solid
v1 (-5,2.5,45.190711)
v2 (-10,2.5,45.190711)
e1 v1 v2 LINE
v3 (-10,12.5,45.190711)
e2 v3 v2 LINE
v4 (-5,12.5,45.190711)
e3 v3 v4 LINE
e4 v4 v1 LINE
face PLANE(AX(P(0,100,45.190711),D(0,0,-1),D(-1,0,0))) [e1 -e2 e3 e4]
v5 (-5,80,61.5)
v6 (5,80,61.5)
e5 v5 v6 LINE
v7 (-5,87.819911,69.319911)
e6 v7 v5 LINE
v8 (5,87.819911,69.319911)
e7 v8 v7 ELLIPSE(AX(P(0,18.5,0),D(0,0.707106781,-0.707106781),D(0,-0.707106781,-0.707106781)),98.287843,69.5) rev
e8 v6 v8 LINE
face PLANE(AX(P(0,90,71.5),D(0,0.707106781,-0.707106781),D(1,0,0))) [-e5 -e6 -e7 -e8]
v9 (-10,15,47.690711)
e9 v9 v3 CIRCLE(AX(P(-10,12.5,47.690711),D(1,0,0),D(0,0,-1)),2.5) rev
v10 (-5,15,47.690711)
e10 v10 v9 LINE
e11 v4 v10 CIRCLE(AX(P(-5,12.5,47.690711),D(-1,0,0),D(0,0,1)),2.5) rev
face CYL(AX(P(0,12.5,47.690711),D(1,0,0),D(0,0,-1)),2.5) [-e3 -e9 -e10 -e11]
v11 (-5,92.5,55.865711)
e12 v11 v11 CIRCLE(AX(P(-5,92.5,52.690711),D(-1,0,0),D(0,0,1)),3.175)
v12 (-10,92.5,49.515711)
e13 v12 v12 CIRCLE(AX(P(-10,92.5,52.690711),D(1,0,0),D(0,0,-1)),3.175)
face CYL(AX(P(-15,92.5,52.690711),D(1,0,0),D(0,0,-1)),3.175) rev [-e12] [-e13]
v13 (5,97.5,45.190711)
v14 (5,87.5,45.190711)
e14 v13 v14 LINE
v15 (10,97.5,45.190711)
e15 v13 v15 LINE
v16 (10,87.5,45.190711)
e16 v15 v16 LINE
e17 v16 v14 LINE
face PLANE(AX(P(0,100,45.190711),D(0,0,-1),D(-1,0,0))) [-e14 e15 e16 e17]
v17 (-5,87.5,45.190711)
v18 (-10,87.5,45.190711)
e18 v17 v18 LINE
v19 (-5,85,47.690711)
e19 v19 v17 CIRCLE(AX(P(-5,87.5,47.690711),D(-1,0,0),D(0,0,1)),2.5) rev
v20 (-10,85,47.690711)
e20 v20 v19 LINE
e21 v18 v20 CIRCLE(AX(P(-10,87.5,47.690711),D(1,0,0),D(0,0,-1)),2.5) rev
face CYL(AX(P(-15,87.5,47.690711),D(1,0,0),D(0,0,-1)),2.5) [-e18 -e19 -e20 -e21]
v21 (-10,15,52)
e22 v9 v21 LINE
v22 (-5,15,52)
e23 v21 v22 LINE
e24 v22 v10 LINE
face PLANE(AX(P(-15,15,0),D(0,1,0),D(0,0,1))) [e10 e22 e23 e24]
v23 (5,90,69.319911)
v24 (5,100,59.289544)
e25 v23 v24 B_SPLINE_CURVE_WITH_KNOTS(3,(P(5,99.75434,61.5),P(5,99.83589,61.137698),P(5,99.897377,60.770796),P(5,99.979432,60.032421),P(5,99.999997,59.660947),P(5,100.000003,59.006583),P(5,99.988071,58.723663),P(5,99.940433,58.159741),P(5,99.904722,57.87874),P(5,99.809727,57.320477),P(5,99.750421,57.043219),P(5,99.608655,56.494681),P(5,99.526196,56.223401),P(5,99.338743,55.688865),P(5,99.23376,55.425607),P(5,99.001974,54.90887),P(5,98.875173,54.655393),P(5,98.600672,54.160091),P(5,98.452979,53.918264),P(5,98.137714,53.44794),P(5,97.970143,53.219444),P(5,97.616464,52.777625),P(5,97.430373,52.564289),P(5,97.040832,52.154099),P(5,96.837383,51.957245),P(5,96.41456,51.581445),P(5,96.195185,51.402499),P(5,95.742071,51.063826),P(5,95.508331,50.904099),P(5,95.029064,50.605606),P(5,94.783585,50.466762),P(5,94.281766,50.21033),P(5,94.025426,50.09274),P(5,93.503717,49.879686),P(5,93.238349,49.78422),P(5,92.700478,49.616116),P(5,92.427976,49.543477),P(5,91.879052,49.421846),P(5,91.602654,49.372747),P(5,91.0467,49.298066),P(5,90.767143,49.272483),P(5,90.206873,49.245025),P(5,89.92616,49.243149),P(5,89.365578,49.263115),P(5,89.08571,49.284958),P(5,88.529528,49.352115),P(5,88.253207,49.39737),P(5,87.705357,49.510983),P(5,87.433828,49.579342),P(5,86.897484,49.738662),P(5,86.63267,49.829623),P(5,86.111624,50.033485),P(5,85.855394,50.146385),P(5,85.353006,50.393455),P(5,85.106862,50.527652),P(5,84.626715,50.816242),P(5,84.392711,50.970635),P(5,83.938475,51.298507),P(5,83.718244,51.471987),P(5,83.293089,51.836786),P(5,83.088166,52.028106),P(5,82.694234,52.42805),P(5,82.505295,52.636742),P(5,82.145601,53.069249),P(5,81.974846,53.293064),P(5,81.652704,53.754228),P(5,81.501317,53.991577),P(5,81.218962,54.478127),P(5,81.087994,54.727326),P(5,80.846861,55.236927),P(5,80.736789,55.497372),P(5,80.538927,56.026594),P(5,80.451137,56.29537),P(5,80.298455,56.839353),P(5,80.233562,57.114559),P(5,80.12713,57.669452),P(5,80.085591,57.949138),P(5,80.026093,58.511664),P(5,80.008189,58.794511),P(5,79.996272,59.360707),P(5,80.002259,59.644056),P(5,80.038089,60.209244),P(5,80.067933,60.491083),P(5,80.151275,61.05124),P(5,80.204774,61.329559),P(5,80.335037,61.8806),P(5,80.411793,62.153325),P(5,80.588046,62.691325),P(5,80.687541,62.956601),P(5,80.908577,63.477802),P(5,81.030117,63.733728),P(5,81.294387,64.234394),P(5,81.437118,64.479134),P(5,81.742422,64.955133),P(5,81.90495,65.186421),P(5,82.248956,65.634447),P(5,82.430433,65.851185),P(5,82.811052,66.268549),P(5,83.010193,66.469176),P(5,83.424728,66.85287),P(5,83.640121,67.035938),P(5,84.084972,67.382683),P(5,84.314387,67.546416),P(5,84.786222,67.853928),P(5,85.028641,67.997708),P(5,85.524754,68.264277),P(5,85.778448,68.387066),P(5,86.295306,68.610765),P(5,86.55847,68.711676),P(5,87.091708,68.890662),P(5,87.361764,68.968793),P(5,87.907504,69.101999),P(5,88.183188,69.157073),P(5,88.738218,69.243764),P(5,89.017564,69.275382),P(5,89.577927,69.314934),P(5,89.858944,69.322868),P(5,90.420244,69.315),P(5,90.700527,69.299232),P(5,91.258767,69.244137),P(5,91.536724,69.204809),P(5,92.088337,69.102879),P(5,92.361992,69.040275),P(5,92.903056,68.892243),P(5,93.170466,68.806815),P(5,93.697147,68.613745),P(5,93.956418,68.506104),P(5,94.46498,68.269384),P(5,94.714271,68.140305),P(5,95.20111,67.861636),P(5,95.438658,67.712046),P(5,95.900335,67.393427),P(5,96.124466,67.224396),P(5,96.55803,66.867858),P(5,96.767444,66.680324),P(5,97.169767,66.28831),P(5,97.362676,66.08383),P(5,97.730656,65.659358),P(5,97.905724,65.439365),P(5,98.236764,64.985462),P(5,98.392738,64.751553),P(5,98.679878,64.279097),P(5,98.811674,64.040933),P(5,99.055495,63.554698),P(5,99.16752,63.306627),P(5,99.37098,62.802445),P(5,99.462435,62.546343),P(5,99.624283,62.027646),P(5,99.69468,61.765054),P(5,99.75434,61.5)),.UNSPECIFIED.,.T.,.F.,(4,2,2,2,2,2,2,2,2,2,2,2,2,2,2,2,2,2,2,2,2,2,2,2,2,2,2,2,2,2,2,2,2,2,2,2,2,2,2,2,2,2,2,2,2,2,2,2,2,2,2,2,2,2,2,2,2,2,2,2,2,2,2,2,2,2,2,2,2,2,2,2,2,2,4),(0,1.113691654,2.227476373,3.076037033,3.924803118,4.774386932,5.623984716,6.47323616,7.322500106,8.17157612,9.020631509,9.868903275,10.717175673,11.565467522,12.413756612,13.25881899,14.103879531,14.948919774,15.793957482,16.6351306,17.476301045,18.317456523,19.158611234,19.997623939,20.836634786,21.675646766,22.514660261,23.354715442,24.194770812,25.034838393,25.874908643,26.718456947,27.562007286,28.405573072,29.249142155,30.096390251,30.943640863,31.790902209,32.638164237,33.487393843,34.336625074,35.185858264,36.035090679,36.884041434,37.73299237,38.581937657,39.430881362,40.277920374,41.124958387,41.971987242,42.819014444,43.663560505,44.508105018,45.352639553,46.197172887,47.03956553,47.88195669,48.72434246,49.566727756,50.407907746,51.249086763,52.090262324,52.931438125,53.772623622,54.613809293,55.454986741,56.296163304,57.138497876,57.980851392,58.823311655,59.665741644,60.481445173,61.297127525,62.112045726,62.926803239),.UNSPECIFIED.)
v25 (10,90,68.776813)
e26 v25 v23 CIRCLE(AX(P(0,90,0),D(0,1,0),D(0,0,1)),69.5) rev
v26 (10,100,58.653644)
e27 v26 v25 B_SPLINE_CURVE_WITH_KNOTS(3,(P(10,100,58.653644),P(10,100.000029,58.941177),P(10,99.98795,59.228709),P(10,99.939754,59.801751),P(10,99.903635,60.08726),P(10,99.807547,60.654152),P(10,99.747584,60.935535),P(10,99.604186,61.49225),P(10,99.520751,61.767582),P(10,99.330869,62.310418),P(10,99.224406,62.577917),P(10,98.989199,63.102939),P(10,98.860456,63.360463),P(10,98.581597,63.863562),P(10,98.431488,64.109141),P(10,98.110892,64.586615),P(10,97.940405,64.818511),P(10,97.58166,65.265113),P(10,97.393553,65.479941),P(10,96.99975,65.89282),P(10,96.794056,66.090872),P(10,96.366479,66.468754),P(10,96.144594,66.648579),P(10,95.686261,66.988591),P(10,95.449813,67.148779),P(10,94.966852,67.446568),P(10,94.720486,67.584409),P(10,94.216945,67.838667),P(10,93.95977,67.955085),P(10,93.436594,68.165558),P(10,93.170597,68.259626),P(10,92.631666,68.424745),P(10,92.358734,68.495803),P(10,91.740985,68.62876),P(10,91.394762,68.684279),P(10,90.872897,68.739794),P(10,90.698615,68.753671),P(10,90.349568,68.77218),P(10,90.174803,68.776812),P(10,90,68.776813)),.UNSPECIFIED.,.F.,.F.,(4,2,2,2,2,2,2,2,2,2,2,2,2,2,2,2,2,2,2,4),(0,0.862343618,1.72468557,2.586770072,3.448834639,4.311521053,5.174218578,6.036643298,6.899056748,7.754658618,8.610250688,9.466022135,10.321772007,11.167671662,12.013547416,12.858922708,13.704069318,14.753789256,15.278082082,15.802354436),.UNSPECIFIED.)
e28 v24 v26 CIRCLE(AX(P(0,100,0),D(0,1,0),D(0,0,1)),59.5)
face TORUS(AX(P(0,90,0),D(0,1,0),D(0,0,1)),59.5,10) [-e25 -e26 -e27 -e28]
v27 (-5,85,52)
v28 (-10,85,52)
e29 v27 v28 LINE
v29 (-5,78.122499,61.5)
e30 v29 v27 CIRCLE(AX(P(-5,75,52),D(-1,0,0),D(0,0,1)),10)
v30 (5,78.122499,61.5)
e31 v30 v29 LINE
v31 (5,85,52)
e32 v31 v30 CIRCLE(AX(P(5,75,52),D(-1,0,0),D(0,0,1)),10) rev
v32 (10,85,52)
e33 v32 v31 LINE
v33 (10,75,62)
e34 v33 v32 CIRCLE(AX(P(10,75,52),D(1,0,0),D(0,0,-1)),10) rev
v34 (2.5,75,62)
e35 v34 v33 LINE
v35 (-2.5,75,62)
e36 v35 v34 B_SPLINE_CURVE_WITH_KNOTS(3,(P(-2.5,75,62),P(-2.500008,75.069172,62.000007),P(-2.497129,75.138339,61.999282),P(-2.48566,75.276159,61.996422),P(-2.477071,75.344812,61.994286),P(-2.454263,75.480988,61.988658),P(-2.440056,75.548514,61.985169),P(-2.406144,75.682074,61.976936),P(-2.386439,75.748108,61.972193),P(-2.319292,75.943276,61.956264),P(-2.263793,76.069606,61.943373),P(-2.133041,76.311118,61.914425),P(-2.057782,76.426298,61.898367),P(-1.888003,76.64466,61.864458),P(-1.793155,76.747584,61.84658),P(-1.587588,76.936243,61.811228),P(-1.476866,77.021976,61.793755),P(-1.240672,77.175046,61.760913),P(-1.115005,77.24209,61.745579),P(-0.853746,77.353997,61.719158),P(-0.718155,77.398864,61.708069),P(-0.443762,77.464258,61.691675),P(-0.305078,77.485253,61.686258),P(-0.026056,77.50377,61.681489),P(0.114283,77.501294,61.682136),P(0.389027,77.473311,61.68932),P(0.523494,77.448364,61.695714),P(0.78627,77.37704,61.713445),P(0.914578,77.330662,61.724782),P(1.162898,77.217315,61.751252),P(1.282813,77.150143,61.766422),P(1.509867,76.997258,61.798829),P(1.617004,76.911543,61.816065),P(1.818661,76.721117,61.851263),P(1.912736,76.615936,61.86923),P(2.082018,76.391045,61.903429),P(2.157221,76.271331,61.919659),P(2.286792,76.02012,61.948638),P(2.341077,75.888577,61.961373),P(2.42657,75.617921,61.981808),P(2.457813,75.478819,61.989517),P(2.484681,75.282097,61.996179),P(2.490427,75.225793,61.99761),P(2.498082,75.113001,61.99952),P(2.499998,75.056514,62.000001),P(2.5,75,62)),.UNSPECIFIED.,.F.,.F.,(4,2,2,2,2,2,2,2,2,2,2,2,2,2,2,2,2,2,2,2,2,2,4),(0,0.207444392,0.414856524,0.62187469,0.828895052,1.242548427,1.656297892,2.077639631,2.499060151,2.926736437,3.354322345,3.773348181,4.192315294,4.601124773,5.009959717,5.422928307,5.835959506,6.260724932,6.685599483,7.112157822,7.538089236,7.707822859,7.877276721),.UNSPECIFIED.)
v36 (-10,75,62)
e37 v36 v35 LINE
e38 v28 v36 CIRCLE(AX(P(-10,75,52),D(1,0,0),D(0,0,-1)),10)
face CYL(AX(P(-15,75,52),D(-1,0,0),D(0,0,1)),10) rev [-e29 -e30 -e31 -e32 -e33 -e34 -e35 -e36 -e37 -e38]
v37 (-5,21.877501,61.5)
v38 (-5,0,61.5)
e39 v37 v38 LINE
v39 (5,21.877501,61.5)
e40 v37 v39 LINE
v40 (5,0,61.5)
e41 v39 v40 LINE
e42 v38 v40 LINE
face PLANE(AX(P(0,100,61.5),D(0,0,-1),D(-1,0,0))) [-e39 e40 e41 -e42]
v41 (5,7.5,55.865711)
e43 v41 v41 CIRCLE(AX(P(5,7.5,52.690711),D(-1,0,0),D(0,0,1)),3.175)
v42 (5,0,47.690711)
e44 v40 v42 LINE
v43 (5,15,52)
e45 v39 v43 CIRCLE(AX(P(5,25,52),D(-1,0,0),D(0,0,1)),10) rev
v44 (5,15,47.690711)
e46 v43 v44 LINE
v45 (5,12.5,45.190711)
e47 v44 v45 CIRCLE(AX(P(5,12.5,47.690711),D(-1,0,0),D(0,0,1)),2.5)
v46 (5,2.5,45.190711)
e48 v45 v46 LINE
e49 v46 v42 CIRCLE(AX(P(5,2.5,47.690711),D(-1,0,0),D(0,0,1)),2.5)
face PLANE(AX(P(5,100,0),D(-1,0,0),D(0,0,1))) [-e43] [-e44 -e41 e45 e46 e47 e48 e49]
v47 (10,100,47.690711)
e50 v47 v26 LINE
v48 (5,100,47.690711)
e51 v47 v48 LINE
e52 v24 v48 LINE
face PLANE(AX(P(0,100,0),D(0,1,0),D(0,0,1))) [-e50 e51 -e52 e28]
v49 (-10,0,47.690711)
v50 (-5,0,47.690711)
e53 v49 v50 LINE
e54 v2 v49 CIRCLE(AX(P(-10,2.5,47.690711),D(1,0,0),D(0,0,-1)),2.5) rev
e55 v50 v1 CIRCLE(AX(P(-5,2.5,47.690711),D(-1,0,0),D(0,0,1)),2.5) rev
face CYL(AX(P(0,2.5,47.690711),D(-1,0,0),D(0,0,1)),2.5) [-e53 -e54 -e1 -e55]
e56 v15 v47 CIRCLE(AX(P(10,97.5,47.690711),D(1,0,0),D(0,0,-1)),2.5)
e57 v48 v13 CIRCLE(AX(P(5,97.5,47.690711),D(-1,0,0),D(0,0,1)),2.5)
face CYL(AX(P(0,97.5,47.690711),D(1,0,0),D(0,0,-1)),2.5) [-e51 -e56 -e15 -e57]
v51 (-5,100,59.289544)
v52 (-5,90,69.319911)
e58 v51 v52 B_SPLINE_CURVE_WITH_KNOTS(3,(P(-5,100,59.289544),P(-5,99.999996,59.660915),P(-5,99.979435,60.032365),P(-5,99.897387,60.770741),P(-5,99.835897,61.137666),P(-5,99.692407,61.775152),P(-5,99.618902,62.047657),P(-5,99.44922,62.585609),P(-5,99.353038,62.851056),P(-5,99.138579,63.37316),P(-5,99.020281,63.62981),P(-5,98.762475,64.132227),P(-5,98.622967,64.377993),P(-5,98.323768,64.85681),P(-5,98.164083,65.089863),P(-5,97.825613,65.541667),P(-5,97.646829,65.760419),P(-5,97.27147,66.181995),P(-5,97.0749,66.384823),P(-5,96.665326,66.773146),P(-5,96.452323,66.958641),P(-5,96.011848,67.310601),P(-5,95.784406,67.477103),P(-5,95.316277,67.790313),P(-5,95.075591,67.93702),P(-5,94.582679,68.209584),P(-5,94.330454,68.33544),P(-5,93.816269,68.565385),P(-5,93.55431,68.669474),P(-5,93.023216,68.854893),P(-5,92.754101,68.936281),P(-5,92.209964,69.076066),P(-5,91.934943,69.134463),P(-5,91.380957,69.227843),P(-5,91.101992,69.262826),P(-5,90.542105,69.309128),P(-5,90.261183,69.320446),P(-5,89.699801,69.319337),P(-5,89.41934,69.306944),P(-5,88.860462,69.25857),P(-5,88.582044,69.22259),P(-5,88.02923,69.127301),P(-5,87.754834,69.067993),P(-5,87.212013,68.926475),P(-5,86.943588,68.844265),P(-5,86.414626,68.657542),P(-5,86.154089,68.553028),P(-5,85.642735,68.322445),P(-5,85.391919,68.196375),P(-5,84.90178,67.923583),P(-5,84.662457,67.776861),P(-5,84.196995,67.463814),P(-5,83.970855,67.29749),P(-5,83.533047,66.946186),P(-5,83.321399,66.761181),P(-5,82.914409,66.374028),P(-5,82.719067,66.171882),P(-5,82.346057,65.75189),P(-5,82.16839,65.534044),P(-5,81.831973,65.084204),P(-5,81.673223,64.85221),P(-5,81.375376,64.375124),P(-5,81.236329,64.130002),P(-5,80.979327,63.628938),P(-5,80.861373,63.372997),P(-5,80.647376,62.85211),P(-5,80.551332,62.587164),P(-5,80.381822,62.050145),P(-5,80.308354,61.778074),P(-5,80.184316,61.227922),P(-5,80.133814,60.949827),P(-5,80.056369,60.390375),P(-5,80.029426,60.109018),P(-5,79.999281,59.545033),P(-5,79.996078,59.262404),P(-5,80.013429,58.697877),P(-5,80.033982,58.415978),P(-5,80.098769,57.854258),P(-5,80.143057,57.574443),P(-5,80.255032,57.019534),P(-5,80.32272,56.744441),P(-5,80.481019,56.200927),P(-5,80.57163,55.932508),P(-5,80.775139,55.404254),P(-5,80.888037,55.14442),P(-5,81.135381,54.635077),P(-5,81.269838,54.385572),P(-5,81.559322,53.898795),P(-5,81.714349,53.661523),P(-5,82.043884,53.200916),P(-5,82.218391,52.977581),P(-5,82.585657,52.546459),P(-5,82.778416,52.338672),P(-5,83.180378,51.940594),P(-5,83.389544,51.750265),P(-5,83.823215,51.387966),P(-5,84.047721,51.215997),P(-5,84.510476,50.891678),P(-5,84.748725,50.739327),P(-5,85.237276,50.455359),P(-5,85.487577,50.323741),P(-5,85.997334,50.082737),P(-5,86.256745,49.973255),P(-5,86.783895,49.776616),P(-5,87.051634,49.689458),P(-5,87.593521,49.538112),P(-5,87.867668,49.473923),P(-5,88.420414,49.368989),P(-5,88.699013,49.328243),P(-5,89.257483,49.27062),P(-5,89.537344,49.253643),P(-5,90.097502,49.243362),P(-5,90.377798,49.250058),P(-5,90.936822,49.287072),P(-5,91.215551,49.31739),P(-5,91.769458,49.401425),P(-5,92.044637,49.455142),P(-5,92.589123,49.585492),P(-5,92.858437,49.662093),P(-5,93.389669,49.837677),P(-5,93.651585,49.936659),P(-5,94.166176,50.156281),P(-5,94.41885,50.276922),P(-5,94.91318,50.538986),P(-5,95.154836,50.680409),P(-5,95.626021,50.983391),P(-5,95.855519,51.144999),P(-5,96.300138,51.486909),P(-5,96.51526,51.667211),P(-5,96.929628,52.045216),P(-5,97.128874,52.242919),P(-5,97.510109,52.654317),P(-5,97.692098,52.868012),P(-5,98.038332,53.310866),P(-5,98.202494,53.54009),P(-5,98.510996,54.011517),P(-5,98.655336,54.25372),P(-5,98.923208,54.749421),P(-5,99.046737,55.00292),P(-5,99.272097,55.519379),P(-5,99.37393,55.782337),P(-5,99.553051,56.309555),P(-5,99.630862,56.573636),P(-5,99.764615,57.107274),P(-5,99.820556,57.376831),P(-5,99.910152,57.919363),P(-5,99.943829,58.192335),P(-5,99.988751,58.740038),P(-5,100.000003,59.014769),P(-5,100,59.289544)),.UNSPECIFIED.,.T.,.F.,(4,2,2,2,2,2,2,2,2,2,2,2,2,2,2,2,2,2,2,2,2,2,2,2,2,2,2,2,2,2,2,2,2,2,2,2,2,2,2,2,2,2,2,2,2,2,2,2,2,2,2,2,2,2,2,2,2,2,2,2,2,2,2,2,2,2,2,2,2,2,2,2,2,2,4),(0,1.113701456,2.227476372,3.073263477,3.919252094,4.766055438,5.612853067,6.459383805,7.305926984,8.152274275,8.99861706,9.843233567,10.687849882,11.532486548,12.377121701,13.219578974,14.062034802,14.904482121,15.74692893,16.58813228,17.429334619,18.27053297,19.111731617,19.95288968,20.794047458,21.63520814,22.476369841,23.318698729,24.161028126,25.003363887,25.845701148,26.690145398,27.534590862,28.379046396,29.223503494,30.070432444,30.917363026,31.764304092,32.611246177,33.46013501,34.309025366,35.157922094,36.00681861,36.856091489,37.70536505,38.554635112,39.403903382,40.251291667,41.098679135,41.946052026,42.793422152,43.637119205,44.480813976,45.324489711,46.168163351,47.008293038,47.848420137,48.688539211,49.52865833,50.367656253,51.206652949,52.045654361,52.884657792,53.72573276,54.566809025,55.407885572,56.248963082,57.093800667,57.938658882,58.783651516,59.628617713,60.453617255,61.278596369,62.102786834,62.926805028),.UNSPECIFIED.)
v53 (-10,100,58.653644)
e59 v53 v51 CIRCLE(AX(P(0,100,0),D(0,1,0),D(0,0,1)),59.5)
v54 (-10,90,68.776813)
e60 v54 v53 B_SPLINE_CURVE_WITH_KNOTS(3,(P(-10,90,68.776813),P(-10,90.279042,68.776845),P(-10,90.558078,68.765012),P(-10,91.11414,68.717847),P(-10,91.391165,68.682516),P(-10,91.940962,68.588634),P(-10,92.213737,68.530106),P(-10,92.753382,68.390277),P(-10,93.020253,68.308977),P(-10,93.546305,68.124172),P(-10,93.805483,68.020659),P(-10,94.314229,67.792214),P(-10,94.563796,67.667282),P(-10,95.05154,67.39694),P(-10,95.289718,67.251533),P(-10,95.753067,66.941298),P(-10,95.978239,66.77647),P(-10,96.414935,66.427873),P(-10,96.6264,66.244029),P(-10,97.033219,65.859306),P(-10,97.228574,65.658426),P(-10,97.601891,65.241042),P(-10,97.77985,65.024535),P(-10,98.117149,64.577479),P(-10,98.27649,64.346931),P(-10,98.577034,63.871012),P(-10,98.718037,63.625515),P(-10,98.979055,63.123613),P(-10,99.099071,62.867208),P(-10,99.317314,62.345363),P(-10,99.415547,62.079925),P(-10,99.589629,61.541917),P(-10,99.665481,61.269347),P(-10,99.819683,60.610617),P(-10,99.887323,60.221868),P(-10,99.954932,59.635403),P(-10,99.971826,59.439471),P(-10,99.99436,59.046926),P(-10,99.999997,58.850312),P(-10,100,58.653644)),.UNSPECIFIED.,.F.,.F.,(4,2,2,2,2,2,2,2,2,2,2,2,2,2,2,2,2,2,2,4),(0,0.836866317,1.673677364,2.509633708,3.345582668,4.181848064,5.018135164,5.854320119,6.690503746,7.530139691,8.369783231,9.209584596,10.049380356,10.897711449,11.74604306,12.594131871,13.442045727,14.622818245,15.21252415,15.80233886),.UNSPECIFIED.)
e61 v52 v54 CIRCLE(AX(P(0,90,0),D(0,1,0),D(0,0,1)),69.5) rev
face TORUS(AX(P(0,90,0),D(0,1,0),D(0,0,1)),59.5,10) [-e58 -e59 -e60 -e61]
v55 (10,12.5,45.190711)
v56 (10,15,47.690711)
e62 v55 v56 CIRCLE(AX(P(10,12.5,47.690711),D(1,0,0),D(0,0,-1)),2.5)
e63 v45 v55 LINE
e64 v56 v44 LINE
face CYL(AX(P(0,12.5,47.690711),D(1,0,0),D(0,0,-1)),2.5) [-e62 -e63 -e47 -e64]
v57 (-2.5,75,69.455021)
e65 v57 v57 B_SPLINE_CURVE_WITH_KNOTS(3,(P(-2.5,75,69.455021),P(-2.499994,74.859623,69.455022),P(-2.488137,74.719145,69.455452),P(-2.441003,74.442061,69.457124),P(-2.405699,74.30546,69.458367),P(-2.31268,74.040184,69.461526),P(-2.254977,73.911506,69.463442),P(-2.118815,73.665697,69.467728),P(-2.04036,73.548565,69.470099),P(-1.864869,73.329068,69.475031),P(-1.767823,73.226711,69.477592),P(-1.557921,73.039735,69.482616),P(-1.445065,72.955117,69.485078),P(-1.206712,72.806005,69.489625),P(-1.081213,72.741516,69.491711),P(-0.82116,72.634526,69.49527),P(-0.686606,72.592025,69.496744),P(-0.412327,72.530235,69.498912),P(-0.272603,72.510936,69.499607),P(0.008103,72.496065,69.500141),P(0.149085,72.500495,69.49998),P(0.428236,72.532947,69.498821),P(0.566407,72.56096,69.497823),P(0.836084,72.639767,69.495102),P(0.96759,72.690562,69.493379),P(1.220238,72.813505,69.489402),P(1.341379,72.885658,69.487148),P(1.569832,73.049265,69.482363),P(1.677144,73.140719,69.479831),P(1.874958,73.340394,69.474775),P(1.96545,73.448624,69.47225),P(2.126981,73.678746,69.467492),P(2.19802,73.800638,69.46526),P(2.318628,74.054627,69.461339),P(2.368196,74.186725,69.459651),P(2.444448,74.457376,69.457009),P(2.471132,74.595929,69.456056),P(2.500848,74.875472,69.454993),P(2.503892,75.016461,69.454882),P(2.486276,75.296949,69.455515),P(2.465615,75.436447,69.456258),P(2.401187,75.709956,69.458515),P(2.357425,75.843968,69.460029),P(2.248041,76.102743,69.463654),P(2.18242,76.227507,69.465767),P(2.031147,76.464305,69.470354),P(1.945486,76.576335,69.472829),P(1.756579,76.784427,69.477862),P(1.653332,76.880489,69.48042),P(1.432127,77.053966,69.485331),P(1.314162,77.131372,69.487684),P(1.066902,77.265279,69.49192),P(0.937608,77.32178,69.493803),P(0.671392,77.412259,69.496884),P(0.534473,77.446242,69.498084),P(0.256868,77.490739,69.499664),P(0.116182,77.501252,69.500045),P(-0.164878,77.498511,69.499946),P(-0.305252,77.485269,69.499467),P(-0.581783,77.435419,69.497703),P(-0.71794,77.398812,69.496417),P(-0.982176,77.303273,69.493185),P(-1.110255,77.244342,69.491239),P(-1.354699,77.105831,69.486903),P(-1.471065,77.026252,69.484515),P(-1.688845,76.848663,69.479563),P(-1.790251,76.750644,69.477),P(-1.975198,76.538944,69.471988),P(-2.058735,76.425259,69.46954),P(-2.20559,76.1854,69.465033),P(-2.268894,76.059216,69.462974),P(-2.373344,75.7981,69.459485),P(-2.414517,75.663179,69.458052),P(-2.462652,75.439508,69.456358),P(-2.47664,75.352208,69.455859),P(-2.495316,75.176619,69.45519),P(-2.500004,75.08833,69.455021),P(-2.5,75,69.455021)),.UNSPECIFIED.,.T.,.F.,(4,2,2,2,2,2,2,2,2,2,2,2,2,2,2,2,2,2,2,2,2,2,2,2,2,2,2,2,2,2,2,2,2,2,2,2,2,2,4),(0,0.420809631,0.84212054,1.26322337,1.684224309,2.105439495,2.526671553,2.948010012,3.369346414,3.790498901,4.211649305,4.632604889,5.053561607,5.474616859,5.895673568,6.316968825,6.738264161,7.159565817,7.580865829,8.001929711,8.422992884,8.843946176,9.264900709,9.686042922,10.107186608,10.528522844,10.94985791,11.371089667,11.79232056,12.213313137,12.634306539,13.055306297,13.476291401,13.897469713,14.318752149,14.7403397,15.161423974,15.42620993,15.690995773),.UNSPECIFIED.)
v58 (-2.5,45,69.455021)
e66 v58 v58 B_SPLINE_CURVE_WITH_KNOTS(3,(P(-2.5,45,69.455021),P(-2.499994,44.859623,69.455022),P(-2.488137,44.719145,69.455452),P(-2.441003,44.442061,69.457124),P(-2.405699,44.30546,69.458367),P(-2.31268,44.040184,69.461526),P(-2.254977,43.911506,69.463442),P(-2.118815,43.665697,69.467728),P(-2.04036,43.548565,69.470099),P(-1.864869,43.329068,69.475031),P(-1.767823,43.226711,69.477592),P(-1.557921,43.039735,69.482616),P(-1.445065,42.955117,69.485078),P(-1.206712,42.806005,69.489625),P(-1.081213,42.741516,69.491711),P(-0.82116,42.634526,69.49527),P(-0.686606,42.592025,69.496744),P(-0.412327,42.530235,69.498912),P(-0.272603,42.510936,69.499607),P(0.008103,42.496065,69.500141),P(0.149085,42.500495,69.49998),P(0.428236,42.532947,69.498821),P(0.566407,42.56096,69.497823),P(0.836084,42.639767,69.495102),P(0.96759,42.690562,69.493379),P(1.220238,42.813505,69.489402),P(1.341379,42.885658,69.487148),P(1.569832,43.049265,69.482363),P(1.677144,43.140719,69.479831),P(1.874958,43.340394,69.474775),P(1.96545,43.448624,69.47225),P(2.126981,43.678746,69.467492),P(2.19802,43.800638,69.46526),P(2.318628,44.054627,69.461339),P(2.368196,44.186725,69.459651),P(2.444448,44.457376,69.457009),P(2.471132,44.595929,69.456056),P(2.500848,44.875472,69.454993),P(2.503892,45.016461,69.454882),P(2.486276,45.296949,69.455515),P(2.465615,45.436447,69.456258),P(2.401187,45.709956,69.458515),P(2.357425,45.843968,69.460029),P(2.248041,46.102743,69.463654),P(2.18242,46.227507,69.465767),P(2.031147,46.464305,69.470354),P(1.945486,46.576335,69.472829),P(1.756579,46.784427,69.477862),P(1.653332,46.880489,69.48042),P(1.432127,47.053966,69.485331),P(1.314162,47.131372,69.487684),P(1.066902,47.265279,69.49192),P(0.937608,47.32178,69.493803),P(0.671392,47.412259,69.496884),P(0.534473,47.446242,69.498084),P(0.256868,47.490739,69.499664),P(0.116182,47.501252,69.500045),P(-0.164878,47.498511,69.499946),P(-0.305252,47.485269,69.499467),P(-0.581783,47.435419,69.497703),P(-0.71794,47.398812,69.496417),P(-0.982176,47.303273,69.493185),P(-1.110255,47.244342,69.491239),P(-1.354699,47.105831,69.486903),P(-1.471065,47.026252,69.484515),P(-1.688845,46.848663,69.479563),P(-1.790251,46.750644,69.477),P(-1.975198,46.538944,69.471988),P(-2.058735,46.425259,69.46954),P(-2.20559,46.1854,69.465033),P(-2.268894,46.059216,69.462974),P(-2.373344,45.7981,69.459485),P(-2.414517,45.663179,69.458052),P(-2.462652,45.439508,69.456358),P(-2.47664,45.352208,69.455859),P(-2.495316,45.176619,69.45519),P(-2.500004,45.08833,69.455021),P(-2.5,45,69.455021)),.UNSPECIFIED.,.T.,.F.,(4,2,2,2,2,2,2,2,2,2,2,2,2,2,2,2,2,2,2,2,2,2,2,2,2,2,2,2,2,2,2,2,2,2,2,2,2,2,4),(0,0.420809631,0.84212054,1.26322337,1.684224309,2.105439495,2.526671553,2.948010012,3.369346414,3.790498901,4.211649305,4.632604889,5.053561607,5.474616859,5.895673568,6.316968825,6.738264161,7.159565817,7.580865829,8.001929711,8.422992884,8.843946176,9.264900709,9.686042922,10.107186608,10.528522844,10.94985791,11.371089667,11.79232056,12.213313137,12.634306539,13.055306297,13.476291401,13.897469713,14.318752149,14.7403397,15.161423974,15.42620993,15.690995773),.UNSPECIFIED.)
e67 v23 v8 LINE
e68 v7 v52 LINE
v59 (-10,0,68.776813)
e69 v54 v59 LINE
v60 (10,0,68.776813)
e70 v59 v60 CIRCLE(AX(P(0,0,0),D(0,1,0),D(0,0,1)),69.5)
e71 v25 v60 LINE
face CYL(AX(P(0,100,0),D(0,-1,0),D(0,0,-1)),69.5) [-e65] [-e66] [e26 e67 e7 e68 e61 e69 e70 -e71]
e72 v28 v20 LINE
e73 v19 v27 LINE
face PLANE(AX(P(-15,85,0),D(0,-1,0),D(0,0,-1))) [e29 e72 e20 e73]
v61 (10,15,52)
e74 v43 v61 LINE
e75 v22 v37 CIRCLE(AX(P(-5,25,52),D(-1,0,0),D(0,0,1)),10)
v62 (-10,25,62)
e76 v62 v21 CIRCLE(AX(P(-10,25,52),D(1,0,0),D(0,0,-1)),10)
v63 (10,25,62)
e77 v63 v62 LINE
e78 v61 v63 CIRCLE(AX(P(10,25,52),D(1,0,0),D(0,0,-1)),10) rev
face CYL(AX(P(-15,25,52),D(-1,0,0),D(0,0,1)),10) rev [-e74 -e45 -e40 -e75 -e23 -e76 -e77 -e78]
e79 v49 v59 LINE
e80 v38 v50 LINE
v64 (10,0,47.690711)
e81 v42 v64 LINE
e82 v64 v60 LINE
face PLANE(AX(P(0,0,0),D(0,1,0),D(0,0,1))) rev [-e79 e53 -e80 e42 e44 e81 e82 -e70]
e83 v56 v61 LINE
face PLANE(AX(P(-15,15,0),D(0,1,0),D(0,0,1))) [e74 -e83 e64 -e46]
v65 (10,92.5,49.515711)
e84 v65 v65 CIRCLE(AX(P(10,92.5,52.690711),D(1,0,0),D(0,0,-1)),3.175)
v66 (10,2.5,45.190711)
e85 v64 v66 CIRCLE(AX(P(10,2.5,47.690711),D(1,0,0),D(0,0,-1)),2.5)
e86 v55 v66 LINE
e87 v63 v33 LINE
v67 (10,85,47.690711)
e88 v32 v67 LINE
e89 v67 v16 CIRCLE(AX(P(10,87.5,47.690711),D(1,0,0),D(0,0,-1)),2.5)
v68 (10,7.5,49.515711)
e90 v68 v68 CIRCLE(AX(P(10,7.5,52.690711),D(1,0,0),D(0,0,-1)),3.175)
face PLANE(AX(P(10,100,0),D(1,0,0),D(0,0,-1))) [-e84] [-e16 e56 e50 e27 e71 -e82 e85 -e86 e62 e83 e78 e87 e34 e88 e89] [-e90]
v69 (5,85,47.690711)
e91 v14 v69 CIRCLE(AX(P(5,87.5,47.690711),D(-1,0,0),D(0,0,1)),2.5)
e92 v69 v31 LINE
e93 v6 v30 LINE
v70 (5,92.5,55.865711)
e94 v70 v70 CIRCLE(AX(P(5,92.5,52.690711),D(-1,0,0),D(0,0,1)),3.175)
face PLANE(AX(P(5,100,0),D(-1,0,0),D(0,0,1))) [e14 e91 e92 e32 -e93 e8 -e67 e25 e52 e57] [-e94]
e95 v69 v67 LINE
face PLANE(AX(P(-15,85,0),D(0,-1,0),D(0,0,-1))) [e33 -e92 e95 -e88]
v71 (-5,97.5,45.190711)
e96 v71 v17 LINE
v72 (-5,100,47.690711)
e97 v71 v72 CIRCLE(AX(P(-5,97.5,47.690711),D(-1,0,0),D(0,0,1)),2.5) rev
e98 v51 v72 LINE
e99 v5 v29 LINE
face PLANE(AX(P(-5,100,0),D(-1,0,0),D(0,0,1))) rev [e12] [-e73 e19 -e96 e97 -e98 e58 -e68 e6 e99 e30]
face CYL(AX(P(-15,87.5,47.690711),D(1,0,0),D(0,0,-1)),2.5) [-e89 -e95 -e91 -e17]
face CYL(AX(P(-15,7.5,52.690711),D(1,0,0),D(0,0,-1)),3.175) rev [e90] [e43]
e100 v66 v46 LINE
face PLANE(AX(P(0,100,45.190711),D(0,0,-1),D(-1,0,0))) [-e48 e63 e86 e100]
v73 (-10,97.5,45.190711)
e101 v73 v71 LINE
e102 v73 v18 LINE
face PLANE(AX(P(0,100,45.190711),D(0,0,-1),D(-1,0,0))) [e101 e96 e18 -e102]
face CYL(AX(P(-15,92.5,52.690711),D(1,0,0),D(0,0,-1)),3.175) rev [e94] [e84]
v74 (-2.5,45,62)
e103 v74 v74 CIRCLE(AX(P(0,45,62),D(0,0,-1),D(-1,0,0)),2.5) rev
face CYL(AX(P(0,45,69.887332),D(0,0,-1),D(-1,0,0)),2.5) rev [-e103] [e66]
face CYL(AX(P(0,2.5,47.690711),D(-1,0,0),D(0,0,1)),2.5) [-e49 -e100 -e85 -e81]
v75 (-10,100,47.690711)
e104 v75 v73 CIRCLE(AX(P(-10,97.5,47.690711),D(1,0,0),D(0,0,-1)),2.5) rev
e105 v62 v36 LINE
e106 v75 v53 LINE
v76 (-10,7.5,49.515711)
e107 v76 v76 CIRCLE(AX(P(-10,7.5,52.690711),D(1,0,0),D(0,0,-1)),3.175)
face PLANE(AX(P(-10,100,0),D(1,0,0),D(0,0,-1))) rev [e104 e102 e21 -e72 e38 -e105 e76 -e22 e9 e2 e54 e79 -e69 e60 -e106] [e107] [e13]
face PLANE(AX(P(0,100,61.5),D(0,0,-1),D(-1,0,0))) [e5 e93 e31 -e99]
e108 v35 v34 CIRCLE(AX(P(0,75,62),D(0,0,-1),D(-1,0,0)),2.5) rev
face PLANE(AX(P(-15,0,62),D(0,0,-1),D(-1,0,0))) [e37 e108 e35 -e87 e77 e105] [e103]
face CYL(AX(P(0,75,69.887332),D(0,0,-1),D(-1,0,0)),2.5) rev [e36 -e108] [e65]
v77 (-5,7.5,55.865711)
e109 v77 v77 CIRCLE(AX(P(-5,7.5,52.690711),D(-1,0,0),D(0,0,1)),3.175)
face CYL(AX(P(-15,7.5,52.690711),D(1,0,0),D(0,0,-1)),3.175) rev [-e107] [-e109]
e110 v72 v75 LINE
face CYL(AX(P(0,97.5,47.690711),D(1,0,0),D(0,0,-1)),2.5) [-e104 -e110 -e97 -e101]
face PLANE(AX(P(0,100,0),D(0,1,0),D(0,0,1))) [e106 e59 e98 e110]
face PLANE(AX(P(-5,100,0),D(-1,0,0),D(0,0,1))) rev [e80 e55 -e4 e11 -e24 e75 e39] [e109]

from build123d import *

# Parameters (mm, degrees)
SKETCH1_W               = 5
SKETCH1_H               = 5.034727375
SKETCH1_H_2             = 16.309288723
BOSS_EXTRUDE10_DEPTH    = 100
SKETCH17_W              = 16.809288723
SKETCH17_H              = 70
CUT_EXTRUDE1_DEPTH      = 25
FILLET1_R               = 10
FILLET2_R               = 2.5
FILLET3_R               = 10
SKETCH17_3_R            = 3.175
CUT_EXTRUDE2_DEPTH      = 25
CUT_EXTRUDE3_START      = -7.276812953
CUT_EXTRUDE3_OUTLINE_W  = 10
CUT_EXTRUDE3_OUTLINE_H  = 10
CUT_EXTRUDE3_DEPTH      = 8
CHAMFER1_SIZE           = 10
CUT_EXTRUDE4_DEPTH      = 104.229376725
CUT_EXTRUDE4_DEPTH_BACK = 20
SKETCH20_R              = 2.5


# Read off the part's stored shape, not the designer's step: Cut-Extrude3
with BuildPart() as part:
    # Sketch1 → Boss-Extrude10 (new body)
    with BuildSketch(Plane(origin=(0, 0, 0), x_dir=(1, 0, 0), z_dir=(0, 1, 0))):
        with BuildLine():
            Line((-5, -66.534727375), (-10, -66.534727375))
            Line((-10, -66.534727375), (-10, -66.755149614))
            ThreePointArc((-10, -66.755149614), (-7.505213856, -67.081456193), (-5, -67.314560089))
            Line((-5, -67.314560089), (-5, -66.534727375))
        make_face()
        with BuildLine():
            ThreePointArc((-5, -67.314560089), (-7.505213856, -67.081456193), (-10, -66.755149614))
            Line((-10, -66.755149614), (-10, -68.018839302))
            ThreePointArc((-10, -68.018839302), (-7.505023524, -68.339133166), (-5, -68.56794076))
            Line((-5, -68.56794076), (-5, -67.314560089))
        make_face()
        with BuildLine():
            ThreePointArc((10, -66.755149614), (7.505213856, -67.081456193), (5, -67.314560089))
            Line((5, -67.314560089), (5, -68.56794076))
            ThreePointArc((5, -68.56794076), (7.505023524, -68.339133166), (10, -68.018839302))
            Line((10, -68.018839302), (10, -66.755149614))
        make_face()
        with BuildLine():
            Line((5, -66.534727375), (5, -67.314560089))
            ThreePointArc((5, -67.314560089), (7.505213856, -67.081456193), (10, -66.755149614))
            Line((10, -66.755149614), (10, -66.534727375))
            Line((10, -66.534727375), (5, -66.534727375))
        make_face()
        with BuildLine():
            Line((0, -66.534727375), (-5, -66.534727375))
            Line((-5, -66.534727375), (-5, -67.314560089))
            ThreePointArc((-5, -67.314560089), (0, -67.5), (5, -67.314560089))
            Line((5, -67.314560089), (5, -66.534727375))
            Line((5, -66.534727375), (0, -66.534727375))
        make_face()
        with BuildLine():
            ThreePointArc((5, -67.314560089), (0, -67.5), (-5, -67.314560089))
            Line((-5, -67.314560089), (-5, -68.56794076))
            ThreePointArc((-5, -68.56794076), (0, -68.75), (5, -68.56794076))
            Line((5, -68.56794076), (5, -67.314560089))
        make_face()
        with Locations((7.5, -64.017363688)):
            Rectangle(SKETCH1_W, SKETCH1_H)
        with Locations((-7.5, -64.017363688)):
            Rectangle(SKETCH1_W, SKETCH1_H)
        Polygon((-5, -61.5), (-5, -66.534727375), (0, -66.534727375), (5, -66.534727375), (5, -61.5), align=None)
        with Locations((-7.5, -53.345355639)):
            Rectangle(SKETCH1_W, SKETCH1_H_2)
        with Locations((7.5, -53.345355639)):
            Rectangle(SKETCH1_W, SKETCH1_H_2)
        with BuildLine():
            ThreePointArc((-5, -68.56794076), (-7.505023524, -68.339133166), (-10, -68.018839302))
            Line((-10, -68.018839302), (-10, -68.776812953))
            ThreePointArc((-10, -68.776812953), (0, -69.5), (10, -68.776812953))
            Line((10, -68.776812953), (10, -68.018839302))
            ThreePointArc((10, -68.018839302), (7.505023524, -68.339133166), (5, -68.56794076))
            ThreePointArc((5, -68.56794076), (0, -68.75), (-5, -68.56794076))
        make_face()
    extrude(amount=BOSS_EXTRUDE10_DEPTH)

    # Sketch17 → Cut-Extrude1 (cut)
    with BuildSketch(Plane(origin=(10, 0, 0), x_dir=(0, 0, -1), z_dir=(1, 0, 0))):
        with Locations((-53.595355639, 50)):
            Rectangle(SKETCH17_W, SKETCH17_H)
    extrude(amount=-CUT_EXTRUDE1_DEPTH, mode=Mode.SUBTRACT)

    # Fillet1
    # the kernel refuses this fillet: 10 mm, written as the material it adds along each edge
    with BuildSketch(Plane(origin=(10, 15, 62), x_dir=(0, 0, -1), z_dir=(-1, 0, 0))) as fillet1_piece_1_section:
        with BuildLine():
            CenterArc((FILLET1_R, -FILLET1_R), FILLET1_R, 90, 90)
            Line((0, -FILLET1_R), (0, 0))
            Line((0, 0), (FILLET1_R, 0))
        make_face()
    fillet1_piece_1 = extrude(amount=20, mode=Mode.PRIVATE)
    fillet1_piece_1 = split(fillet1_piece_1, bisect_by=Plane(origin=(5, 16.64778747, 59.064177201), z_dir=(1, 0, 0)), keep=Keep.TOP, mode=Mode.PRIVATE)
    fillet1_piece_1 = split(fillet1_piece_1, bisect_by=Plane(origin=(7.5, 16.64778747, 61.5), z_dir=(0, 0, -1)), keep=Keep.TOP, mode=Mode.PRIVATE)
    add(fillet1_piece_1)
    with BuildSketch(Plane(origin=(10, 15, 62), x_dir=(0, 0, -1), z_dir=(-1, 0, 0))) as fillet1_piece_2_section:
        with BuildLine():
            CenterArc((FILLET1_R, -FILLET1_R), FILLET1_R, 90, 90)
            Line((0, -FILLET1_R), (0, 0))
            Line((0, 0), (FILLET1_R, 0))
        make_face()
    fillet1_piece_2 = extrude(amount=20, mode=Mode.PRIVATE)
    fillet1_piece_2 = split(fillet1_piece_2, bisect_by=Plane(origin=(5, 19.226172228, 61.875676343), z_dir=(1, 0, 0)), keep=Keep.TOP, mode=Mode.PRIVATE)
    fillet1_piece_2 = split(fillet1_piece_2, bisect_by=Plane(origin=(7.5, 19.226172228, 61.5), z_dir=(0, 0, 1)), keep=Keep.TOP, mode=Mode.PRIVATE)
    add(fillet1_piece_2)
    with BuildSketch(Plane(origin=(10, 15, 62), x_dir=(0, 0, -1), z_dir=(-1, 0, 0))) as fillet1_piece_3_section:
        with BuildLine():
            CenterArc((FILLET1_R, -FILLET1_R), FILLET1_R, 90, 90)
            Line((0, -FILLET1_R), (0, 0))
            Line((0, 0), (FILLET1_R, 0))
        make_face()
    fillet1_piece_3 = extrude(amount=20, mode=Mode.PRIVATE)
    fillet1_piece_3 = split(fillet1_piece_3, bisect_by=Plane(origin=(5, 19.226172228, 61.875676343), z_dir=(-1, 0, 0)), keep=Keep.TOP, mode=Mode.PRIVATE)
    fillet1_piece_3 = split(fillet1_piece_3, bisect_by=Plane(origin=(0, 19.226172228, 61.5), z_dir=(0, 0, 1)), keep=Keep.TOP, mode=Mode.PRIVATE)
    fillet1_piece_3 = split(fillet1_piece_3, bisect_by=Plane(origin=(-5, 19.226172228, 61.875676343), z_dir=(1, 0, 0)), keep=Keep.TOP, mode=Mode.PRIVATE)
    add(fillet1_piece_3)
    with BuildSketch(Plane(origin=(10, 15, 62), x_dir=(0, 0, -1), z_dir=(-1, 0, 0))) as fillet1_piece_4_section:
        with BuildLine():
            CenterArc((FILLET1_R, -FILLET1_R), FILLET1_R, 90, 90)
            Line((0, -FILLET1_R), (0, 0))
            Line((0, 0), (FILLET1_R, 0))
        make_face()
    fillet1_piece_4 = extrude(amount=20, mode=Mode.PRIVATE)
    fillet1_piece_4 = split(fillet1_piece_4, bisect_by=Plane(origin=(-7.5, 16.64778747, 61.5), z_dir=(0, 0, -1)), keep=Keep.TOP, mode=Mode.PRIVATE)
    fillet1_piece_4 = split(fillet1_piece_4, bisect_by=Plane(origin=(-5, 16.64778747, 59.064177201), z_dir=(-1, 0, 0)), keep=Keep.TOP, mode=Mode.PRIVATE)
    add(fillet1_piece_4)
    with BuildSketch(Plane(origin=(10, 15, 62), x_dir=(0, 0, -1), z_dir=(-1, 0, 0))) as fillet1_piece_5_section:
        with BuildLine():
            CenterArc((FILLET1_R, -FILLET1_R), FILLET1_R, 90, 90)
            Line((0, -FILLET1_R), (0, 0))
            Line((0, 0), (FILLET1_R, 0))
        make_face()
    fillet1_piece_5 = extrude(amount=20, mode=Mode.PRIVATE)
    fillet1_piece_5 = split(fillet1_piece_5, bisect_by=Plane(origin=(-7.5, 19.226172228, 61.5), z_dir=(0, 0, 1)), keep=Keep.TOP, mode=Mode.PRIVATE)
    fillet1_piece_5 = split(fillet1_piece_5, bisect_by=Plane(origin=(-5, 19.226172228, 61.875676343), z_dir=(-1, 0, 0)), keep=Keep.TOP, mode=Mode.PRIVATE)
    add(fillet1_piece_5)
    with BuildSketch(Plane(origin=(10, 85, 62), x_dir=(0, -1, 0), z_dir=(-1, 0, 0))) as fillet1_piece_6_section:
        with BuildLine():
            CenterArc((FILLET1_R, -FILLET1_R), FILLET1_R, 90, 90)
            Line((0, -FILLET1_R), (0, 0))
            Line((0, 0), (FILLET1_R, 0))
        make_face()
    fillet1_piece_6 = extrude(amount=20, mode=Mode.PRIVATE)
    fillet1_piece_6 = split(fillet1_piece_6, bisect_by=Plane(origin=(7.5, 80.773827772, 61.5), z_dir=(0, 0, 1)), keep=Keep.TOP, mode=Mode.PRIVATE)
    fillet1_piece_6 = split(fillet1_piece_6, bisect_by=Plane(origin=(5, 80.773827772, 61.875676343), z_dir=(1, 0, 0)), keep=Keep.TOP, mode=Mode.PRIVATE)
    add(fillet1_piece_6)
    with BuildSketch(Plane(origin=(10, 85, 62), x_dir=(0, -1, 0), z_dir=(-1, 0, 0))) as fillet1_piece_7_section:
        with BuildLine():
            CenterArc((FILLET1_R, -FILLET1_R), FILLET1_R, 90, 90)
            Line((0, -FILLET1_R), (0, 0))
            Line((0, 0), (FILLET1_R, 0))
        make_face()
    fillet1_piece_7 = extrude(amount=20, mode=Mode.PRIVATE)
    fillet1_piece_7 = split(fillet1_piece_7, bisect_by=Plane(origin=(7.5, 83.35221253, 61.5), z_dir=(0, 0, -1)), keep=Keep.TOP, mode=Mode.PRIVATE)
    fillet1_piece_7 = split(fillet1_piece_7, bisect_by=Plane(origin=(5, 83.35221253, 59.064177201), z_dir=(1, 0, 0)), keep=Keep.TOP, mode=Mode.PRIVATE)
    add(fillet1_piece_7)
    with BuildSketch(Plane(origin=(10, 85, 62), x_dir=(0, -1, 0), z_dir=(-1, 0, 0))) as fillet1_piece_8_section:
        with BuildLine():
            CenterArc((FILLET1_R, -FILLET1_R), FILLET1_R, 90, 90)
            Line((0, -FILLET1_R), (0, 0))
            Line((0, 0), (FILLET1_R, 0))
        make_face()
    fillet1_piece_8 = extrude(amount=20, mode=Mode.PRIVATE)
    fillet1_piece_8 = split(fillet1_piece_8, bisect_by=Plane(origin=(-5, 80.773827772, 61.875676343), z_dir=(1, 0, 0)), keep=Keep.TOP, mode=Mode.PRIVATE)
    fillet1_piece_8 = split(fillet1_piece_8, bisect_by=Plane(origin=(0, 80.773827772, 61.5), z_dir=(0, 0, 1)), keep=Keep.TOP, mode=Mode.PRIVATE)
    fillet1_piece_8 = split(fillet1_piece_8, bisect_by=Plane(origin=(5, 80.773827772, 61.875676343), z_dir=(-1, 0, 0)), keep=Keep.TOP, mode=Mode.PRIVATE)
    add(fillet1_piece_8)
    with BuildSketch(Plane(origin=(10, 85, 62), x_dir=(0, -1, 0), z_dir=(-1, 0, 0))) as fillet1_piece_9_section:
        with BuildLine():
            CenterArc((FILLET1_R, -FILLET1_R), FILLET1_R, 90, 90)
            Line((0, -FILLET1_R), (0, 0))
            Line((0, 0), (FILLET1_R, 0))
        make_face()
    fillet1_piece_9 = extrude(amount=20, mode=Mode.PRIVATE)
    fillet1_piece_9 = split(fillet1_piece_9, bisect_by=Plane(origin=(-5, 80.773827772, 61.875676343), z_dir=(-1, 0, 0)), keep=Keep.TOP, mode=Mode.PRIVATE)
    fillet1_piece_9 = split(fillet1_piece_9, bisect_by=Plane(origin=(-7.5, 80.773827772, 61.5), z_dir=(0, 0, 1)), keep=Keep.TOP, mode=Mode.PRIVATE)
    add(fillet1_piece_9)
    with BuildSketch(Plane(origin=(10, 85, 62), x_dir=(0, -1, 0), z_dir=(-1, 0, 0))) as fillet1_piece_10_section:
        with BuildLine():
            CenterArc((FILLET1_R, -FILLET1_R), FILLET1_R, 90, 90)
            Line((0, -FILLET1_R), (0, 0))
            Line((0, 0), (FILLET1_R, 0))
        make_face()
    fillet1_piece_10 = extrude(amount=20, mode=Mode.PRIVATE)
    fillet1_piece_10 = split(fillet1_piece_10, bisect_by=Plane(origin=(-5, 83.35221253, 59.064177201), z_dir=(-1, 0, 0)), keep=Keep.TOP, mode=Mode.PRIVATE)
    fillet1_piece_10 = split(fillet1_piece_10, bisect_by=Plane(origin=(-7.5, 83.35221253, 61.5), z_dir=(0, 0, -1)), keep=Keep.TOP, mode=Mode.PRIVATE)
    add(fillet1_piece_10)

    # Fillet2
    fillet2_edges = [part.edges().sort_by_distance(p)[0] for p in [
        (-7.5, 0, 45.190711277),
        (7.5, 0, 45.190711277),
        (7.5, 100, 45.190711277),
        (-7.5, 100, 45.190711277),
        (-7.5, 85, 45.190711277),
        (7.5, 85, 45.190711277),
        (7.5, 15, 45.190711277),
        (-7.5, 15, 45.190711277),
    ]]
    fillet(fillet2_edges, radius=FILLET2_R)

    # Fillet3
    # the kernel refuses this fillet: 10 mm, written as the material it takes off along each edge
    with BuildSketch(Plane(origin=(0, 100, 0), x_dir=(-0.4830223536282857, 0, 0.8756080206892758), z_dir=(-0.8756080206892758, 0, -0.4830223536282857))) as fillet3_piece_1:
        with BuildLine():
            CenterArc((69.5 - FILLET3_R, -FILLET3_R), FILLET3_R, 0, 90)
            Line((69.5, -FILLET3_R), (69.5, 0))
            Line((69.5, 0), (69.5 - FILLET3_R, 0))
        make_face()
    revolve(axis=Axis((0, 100, 0), (0, 1, 0)), revolution_arc=57.765966915, mode=Mode.SUBTRACT)

    # Sketch17<3> → Cut-Extrude2 (cut)
    with BuildSketch(Plane(origin=(10, 0, 0), x_dir=(0, 0, -1), z_dir=(1, 0, 0))):
        with Locations((-52.690711277, 92.5)):
            Circle(SKETCH17_3_R)
        with Locations((-52.690711277, 7.5)):
            Circle(SKETCH17_3_R)
    extrude(amount=-CUT_EXTRUDE2_DEPTH, mode=Mode.SUBTRACT)

    # Cut-Extrude3 outline → Cut-Extrude3 (cut)
    with BuildSketch(Plane.XY.offset(68.776812953).offset(CUT_EXTRUDE3_START)):
        with Locations((0, 95)):
            Rectangle(CUT_EXTRUDE3_OUTLINE_W, CUT_EXTRUDE3_OUTLINE_H)
    extrude(amount=CUT_EXTRUDE3_DEPTH, mode=Mode.SUBTRACT)

    # Chamfer1
    # the kernel refuses this chamfer: 10 mm, written as the material it takes off along each edge
    with BuildSketch(Plane(origin=(-5, 90, 61.5), x_dir=(0, 0.02749587661029838, 0.9996219169113046), z_dir=(1, 0, 0))) as chamfer1_piece_1:
        Polygon((CHAMFER1_SIZE * 0.999621916911, CHAMFER1_SIZE * 0.0274958766103), (-CHAMFER1_SIZE * 0.0274958766307, CHAMFER1_SIZE * 0.999621916911), (0, 0), align=None)
    extrude(amount=10, mode=Mode.SUBTRACT)

    # Sketch20 → Cut-Extrude4 (cut, two sides: drawn at the far end of the back side and taken through both)
    with BuildSketch(Plane.XY.offset(68.776812953).offset(-CUT_EXTRUDE4_DEPTH_BACK)):
        with Locations(Location((0, 75, 0), (0, 0, 180))):
            Circle(SKETCH20_R)
        with Locations(Location((0, 45, 0), (0, 0, 180))):
            Circle(SKETCH20_R)
    extrude(amount=CUT_EXTRUDE4_DEPTH + CUT_EXTRUDE4_DEPTH_BACK, mode=Mode.SUBTRACT)


solid = part.part
